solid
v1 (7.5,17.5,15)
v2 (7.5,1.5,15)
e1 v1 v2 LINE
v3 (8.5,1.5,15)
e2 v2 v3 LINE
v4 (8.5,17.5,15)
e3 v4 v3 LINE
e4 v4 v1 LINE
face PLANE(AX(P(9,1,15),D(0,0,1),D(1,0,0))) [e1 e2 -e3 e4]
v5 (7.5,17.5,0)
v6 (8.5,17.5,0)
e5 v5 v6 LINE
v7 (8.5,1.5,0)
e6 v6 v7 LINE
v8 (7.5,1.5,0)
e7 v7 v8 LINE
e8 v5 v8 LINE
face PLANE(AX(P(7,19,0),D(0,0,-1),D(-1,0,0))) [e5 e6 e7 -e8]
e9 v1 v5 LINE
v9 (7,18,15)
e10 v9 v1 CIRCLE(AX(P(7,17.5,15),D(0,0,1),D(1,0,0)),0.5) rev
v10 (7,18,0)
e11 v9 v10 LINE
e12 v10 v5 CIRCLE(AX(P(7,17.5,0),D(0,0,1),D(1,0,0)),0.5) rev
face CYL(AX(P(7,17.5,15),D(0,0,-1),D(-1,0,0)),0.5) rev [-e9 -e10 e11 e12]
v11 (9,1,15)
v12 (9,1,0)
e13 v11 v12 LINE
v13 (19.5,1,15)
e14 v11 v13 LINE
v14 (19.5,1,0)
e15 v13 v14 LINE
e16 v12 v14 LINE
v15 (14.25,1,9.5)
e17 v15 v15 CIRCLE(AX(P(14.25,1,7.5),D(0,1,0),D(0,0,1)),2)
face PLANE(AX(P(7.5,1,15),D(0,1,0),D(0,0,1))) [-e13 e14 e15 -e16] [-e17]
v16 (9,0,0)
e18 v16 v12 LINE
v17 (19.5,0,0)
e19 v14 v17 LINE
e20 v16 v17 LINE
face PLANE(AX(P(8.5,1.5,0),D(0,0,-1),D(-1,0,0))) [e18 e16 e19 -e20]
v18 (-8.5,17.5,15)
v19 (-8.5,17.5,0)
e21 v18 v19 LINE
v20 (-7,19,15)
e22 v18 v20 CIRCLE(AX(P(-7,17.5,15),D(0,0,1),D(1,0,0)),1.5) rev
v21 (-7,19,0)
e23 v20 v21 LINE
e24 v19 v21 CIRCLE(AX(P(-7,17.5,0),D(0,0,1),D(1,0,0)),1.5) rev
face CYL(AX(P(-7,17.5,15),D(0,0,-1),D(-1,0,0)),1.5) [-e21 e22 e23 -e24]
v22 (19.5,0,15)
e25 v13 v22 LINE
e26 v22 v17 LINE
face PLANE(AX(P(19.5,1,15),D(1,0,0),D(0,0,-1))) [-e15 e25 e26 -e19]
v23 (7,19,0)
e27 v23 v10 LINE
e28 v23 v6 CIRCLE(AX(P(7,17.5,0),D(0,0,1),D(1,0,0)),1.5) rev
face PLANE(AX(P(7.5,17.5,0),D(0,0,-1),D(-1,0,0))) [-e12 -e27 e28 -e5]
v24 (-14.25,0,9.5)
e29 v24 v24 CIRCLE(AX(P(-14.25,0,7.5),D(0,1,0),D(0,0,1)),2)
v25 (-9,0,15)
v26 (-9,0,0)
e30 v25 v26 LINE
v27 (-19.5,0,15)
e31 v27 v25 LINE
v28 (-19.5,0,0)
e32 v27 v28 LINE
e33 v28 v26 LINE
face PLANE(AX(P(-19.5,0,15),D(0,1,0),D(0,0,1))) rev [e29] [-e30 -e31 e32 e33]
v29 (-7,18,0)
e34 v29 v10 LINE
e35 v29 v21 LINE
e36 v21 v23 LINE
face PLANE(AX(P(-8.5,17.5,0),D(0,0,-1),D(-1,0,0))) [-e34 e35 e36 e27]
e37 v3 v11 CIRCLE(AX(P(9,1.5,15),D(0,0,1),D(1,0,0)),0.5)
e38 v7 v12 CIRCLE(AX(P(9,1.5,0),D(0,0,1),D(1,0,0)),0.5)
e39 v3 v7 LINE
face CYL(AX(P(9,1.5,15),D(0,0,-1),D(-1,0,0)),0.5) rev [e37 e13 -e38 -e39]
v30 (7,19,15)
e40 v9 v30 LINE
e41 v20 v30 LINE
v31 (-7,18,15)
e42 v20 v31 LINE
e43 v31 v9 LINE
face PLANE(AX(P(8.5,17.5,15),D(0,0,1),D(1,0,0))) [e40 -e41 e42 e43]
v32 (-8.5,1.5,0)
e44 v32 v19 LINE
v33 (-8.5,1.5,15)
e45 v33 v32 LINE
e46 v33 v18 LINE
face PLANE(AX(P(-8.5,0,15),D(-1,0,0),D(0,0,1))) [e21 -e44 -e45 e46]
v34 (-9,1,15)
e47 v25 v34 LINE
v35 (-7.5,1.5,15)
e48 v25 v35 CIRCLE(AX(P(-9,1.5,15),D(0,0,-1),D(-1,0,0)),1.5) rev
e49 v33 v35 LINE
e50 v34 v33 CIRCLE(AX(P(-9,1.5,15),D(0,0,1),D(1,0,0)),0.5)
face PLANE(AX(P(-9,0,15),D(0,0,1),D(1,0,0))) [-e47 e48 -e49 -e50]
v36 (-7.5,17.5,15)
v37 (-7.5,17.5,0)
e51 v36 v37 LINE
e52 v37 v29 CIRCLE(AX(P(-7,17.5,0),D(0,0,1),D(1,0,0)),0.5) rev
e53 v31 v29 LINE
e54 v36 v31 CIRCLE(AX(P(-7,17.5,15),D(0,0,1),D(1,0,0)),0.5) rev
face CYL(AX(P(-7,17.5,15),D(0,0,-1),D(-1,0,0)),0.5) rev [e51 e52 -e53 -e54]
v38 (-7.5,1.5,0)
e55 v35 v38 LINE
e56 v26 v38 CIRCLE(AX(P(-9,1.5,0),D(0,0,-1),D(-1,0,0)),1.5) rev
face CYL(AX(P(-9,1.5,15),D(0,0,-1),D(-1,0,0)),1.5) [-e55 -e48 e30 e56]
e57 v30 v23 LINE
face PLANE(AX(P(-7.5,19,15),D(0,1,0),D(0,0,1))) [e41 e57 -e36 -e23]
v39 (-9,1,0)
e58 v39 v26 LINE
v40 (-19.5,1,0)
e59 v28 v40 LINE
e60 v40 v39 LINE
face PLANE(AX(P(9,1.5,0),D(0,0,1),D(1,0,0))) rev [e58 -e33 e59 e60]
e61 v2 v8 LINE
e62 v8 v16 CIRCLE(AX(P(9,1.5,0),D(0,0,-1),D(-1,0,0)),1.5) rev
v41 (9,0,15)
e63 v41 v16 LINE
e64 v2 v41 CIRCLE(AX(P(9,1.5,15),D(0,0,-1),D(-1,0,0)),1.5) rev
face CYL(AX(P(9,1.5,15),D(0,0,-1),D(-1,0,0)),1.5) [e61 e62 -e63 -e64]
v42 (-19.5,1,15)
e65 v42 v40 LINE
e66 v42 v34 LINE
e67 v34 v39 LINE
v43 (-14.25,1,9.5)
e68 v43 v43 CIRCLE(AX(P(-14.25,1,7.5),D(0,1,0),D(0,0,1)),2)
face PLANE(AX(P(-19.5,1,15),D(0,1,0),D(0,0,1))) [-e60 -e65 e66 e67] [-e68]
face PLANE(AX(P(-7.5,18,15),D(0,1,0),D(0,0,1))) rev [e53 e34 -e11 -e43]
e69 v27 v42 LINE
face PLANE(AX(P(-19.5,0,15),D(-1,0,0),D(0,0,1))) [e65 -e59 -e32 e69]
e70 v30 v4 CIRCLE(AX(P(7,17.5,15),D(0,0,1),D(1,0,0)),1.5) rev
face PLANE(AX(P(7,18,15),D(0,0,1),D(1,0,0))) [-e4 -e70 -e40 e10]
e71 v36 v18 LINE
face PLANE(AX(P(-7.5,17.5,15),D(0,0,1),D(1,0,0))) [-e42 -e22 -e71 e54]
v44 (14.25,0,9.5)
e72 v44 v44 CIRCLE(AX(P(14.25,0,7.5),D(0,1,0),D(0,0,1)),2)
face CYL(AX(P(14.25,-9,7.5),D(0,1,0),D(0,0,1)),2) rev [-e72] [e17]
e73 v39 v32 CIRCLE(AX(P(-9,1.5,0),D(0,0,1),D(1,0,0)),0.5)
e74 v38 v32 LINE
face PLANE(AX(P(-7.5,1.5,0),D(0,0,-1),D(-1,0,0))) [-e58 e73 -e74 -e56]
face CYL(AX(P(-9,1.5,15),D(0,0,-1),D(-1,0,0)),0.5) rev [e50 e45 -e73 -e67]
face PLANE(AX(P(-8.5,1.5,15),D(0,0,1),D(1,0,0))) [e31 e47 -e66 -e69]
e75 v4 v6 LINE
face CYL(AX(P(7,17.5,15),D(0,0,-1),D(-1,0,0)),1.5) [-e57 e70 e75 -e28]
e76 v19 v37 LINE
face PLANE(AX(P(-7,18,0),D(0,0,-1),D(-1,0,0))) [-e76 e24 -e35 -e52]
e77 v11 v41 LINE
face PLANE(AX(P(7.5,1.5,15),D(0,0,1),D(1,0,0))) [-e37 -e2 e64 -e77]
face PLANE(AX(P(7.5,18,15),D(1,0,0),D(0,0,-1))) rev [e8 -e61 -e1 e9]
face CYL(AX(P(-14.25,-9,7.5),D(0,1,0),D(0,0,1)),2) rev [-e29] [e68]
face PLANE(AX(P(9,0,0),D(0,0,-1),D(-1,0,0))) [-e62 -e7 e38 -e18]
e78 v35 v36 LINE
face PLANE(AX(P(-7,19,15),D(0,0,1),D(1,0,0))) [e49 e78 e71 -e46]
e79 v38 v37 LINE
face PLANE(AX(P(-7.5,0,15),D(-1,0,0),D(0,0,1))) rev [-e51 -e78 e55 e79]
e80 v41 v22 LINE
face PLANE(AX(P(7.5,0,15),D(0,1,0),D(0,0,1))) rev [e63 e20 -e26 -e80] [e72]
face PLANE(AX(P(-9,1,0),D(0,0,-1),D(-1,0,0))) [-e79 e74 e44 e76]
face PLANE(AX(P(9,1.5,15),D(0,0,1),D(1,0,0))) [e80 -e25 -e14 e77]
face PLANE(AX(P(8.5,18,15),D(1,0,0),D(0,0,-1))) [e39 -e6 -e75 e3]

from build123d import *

# Parameters (mm, degrees)
FLANGE_BASE1_DEPTH    = 15
ESBO_O3_R             = 2
CORTE_EXTRUS_O2_DEPTH = 10


# Sheet-metal steps are written as plain solids
with BuildPart() as part:
    # Esboço1 → Flange-base1 (new body)
    with BuildSketch(Plane.XY):
        with BuildLine():
            Line((-19.5, 0), (-9, 0))
            ThreePointArc((-9, 0), (-7.939339828, 0.439339828), (-7.5, 1.5))
            Line((-7.5, 1.5), (-7.5, 17.5))
            ThreePointArc((-7.5, 17.5), (-7.353553391, 17.853553391), (-7, 18))
            Line((-7, 18), (7, 18))
            ThreePointArc((7, 18), (7.353553391, 17.853553391), (7.5, 17.5))
            Line((7.5, 17.5), (7.5, 1.5))
            ThreePointArc((7.5, 1.5), (7.939339828, 0.439339828), (9, 0))
            Line((9, 0), (19.5, 0))
            Line((19.5, 0), (19.5, 1))
            Line((19.5, 1), (9, 1))
            ThreePointArc((9, 1), (8.646446609, 1.146446609), (8.5, 1.5))
            Line((8.5, 1.5), (8.5, 17.5))
            ThreePointArc((8.5, 17.5), (8.060660172, 18.560660172), (7, 19))
            Line((7, 19), (-7, 19))
            ThreePointArc((-7, 19), (-8.060660172, 18.560660172), (-8.5, 17.5))
            Line((-8.5, 17.5), (-8.5, 1.5))
            ThreePointArc((-8.5, 1.5), (-8.646446609, 1.146446609), (-9, 1))
            Line((-9, 1), (-19.5, 1))
            Line((-19.5, 1), (-19.5, 0))
        make_face()
    extrude(amount=FLANGE_BASE1_DEPTH)

    # Esboço3 → Corte-extrusão2 (cut)
    with BuildSketch(Plane(origin=(0, 1, 0), x_dir=(1, 0, 0), z_dir=(0, 1, 0))):
        with Locations(Location((-14.25, -7.5, 0), (0, 0, 270))):
            Circle(ESBO_O3_R)
        with Locations(Location((14.25, -7.5, 0), (0, 0, 270))):
            Circle(ESBO_O3_R)
    extrude(amount=-CORTE_EXTRUS_O2_DEPTH, mode=Mode.SUBTRACT)


solid = part.part
